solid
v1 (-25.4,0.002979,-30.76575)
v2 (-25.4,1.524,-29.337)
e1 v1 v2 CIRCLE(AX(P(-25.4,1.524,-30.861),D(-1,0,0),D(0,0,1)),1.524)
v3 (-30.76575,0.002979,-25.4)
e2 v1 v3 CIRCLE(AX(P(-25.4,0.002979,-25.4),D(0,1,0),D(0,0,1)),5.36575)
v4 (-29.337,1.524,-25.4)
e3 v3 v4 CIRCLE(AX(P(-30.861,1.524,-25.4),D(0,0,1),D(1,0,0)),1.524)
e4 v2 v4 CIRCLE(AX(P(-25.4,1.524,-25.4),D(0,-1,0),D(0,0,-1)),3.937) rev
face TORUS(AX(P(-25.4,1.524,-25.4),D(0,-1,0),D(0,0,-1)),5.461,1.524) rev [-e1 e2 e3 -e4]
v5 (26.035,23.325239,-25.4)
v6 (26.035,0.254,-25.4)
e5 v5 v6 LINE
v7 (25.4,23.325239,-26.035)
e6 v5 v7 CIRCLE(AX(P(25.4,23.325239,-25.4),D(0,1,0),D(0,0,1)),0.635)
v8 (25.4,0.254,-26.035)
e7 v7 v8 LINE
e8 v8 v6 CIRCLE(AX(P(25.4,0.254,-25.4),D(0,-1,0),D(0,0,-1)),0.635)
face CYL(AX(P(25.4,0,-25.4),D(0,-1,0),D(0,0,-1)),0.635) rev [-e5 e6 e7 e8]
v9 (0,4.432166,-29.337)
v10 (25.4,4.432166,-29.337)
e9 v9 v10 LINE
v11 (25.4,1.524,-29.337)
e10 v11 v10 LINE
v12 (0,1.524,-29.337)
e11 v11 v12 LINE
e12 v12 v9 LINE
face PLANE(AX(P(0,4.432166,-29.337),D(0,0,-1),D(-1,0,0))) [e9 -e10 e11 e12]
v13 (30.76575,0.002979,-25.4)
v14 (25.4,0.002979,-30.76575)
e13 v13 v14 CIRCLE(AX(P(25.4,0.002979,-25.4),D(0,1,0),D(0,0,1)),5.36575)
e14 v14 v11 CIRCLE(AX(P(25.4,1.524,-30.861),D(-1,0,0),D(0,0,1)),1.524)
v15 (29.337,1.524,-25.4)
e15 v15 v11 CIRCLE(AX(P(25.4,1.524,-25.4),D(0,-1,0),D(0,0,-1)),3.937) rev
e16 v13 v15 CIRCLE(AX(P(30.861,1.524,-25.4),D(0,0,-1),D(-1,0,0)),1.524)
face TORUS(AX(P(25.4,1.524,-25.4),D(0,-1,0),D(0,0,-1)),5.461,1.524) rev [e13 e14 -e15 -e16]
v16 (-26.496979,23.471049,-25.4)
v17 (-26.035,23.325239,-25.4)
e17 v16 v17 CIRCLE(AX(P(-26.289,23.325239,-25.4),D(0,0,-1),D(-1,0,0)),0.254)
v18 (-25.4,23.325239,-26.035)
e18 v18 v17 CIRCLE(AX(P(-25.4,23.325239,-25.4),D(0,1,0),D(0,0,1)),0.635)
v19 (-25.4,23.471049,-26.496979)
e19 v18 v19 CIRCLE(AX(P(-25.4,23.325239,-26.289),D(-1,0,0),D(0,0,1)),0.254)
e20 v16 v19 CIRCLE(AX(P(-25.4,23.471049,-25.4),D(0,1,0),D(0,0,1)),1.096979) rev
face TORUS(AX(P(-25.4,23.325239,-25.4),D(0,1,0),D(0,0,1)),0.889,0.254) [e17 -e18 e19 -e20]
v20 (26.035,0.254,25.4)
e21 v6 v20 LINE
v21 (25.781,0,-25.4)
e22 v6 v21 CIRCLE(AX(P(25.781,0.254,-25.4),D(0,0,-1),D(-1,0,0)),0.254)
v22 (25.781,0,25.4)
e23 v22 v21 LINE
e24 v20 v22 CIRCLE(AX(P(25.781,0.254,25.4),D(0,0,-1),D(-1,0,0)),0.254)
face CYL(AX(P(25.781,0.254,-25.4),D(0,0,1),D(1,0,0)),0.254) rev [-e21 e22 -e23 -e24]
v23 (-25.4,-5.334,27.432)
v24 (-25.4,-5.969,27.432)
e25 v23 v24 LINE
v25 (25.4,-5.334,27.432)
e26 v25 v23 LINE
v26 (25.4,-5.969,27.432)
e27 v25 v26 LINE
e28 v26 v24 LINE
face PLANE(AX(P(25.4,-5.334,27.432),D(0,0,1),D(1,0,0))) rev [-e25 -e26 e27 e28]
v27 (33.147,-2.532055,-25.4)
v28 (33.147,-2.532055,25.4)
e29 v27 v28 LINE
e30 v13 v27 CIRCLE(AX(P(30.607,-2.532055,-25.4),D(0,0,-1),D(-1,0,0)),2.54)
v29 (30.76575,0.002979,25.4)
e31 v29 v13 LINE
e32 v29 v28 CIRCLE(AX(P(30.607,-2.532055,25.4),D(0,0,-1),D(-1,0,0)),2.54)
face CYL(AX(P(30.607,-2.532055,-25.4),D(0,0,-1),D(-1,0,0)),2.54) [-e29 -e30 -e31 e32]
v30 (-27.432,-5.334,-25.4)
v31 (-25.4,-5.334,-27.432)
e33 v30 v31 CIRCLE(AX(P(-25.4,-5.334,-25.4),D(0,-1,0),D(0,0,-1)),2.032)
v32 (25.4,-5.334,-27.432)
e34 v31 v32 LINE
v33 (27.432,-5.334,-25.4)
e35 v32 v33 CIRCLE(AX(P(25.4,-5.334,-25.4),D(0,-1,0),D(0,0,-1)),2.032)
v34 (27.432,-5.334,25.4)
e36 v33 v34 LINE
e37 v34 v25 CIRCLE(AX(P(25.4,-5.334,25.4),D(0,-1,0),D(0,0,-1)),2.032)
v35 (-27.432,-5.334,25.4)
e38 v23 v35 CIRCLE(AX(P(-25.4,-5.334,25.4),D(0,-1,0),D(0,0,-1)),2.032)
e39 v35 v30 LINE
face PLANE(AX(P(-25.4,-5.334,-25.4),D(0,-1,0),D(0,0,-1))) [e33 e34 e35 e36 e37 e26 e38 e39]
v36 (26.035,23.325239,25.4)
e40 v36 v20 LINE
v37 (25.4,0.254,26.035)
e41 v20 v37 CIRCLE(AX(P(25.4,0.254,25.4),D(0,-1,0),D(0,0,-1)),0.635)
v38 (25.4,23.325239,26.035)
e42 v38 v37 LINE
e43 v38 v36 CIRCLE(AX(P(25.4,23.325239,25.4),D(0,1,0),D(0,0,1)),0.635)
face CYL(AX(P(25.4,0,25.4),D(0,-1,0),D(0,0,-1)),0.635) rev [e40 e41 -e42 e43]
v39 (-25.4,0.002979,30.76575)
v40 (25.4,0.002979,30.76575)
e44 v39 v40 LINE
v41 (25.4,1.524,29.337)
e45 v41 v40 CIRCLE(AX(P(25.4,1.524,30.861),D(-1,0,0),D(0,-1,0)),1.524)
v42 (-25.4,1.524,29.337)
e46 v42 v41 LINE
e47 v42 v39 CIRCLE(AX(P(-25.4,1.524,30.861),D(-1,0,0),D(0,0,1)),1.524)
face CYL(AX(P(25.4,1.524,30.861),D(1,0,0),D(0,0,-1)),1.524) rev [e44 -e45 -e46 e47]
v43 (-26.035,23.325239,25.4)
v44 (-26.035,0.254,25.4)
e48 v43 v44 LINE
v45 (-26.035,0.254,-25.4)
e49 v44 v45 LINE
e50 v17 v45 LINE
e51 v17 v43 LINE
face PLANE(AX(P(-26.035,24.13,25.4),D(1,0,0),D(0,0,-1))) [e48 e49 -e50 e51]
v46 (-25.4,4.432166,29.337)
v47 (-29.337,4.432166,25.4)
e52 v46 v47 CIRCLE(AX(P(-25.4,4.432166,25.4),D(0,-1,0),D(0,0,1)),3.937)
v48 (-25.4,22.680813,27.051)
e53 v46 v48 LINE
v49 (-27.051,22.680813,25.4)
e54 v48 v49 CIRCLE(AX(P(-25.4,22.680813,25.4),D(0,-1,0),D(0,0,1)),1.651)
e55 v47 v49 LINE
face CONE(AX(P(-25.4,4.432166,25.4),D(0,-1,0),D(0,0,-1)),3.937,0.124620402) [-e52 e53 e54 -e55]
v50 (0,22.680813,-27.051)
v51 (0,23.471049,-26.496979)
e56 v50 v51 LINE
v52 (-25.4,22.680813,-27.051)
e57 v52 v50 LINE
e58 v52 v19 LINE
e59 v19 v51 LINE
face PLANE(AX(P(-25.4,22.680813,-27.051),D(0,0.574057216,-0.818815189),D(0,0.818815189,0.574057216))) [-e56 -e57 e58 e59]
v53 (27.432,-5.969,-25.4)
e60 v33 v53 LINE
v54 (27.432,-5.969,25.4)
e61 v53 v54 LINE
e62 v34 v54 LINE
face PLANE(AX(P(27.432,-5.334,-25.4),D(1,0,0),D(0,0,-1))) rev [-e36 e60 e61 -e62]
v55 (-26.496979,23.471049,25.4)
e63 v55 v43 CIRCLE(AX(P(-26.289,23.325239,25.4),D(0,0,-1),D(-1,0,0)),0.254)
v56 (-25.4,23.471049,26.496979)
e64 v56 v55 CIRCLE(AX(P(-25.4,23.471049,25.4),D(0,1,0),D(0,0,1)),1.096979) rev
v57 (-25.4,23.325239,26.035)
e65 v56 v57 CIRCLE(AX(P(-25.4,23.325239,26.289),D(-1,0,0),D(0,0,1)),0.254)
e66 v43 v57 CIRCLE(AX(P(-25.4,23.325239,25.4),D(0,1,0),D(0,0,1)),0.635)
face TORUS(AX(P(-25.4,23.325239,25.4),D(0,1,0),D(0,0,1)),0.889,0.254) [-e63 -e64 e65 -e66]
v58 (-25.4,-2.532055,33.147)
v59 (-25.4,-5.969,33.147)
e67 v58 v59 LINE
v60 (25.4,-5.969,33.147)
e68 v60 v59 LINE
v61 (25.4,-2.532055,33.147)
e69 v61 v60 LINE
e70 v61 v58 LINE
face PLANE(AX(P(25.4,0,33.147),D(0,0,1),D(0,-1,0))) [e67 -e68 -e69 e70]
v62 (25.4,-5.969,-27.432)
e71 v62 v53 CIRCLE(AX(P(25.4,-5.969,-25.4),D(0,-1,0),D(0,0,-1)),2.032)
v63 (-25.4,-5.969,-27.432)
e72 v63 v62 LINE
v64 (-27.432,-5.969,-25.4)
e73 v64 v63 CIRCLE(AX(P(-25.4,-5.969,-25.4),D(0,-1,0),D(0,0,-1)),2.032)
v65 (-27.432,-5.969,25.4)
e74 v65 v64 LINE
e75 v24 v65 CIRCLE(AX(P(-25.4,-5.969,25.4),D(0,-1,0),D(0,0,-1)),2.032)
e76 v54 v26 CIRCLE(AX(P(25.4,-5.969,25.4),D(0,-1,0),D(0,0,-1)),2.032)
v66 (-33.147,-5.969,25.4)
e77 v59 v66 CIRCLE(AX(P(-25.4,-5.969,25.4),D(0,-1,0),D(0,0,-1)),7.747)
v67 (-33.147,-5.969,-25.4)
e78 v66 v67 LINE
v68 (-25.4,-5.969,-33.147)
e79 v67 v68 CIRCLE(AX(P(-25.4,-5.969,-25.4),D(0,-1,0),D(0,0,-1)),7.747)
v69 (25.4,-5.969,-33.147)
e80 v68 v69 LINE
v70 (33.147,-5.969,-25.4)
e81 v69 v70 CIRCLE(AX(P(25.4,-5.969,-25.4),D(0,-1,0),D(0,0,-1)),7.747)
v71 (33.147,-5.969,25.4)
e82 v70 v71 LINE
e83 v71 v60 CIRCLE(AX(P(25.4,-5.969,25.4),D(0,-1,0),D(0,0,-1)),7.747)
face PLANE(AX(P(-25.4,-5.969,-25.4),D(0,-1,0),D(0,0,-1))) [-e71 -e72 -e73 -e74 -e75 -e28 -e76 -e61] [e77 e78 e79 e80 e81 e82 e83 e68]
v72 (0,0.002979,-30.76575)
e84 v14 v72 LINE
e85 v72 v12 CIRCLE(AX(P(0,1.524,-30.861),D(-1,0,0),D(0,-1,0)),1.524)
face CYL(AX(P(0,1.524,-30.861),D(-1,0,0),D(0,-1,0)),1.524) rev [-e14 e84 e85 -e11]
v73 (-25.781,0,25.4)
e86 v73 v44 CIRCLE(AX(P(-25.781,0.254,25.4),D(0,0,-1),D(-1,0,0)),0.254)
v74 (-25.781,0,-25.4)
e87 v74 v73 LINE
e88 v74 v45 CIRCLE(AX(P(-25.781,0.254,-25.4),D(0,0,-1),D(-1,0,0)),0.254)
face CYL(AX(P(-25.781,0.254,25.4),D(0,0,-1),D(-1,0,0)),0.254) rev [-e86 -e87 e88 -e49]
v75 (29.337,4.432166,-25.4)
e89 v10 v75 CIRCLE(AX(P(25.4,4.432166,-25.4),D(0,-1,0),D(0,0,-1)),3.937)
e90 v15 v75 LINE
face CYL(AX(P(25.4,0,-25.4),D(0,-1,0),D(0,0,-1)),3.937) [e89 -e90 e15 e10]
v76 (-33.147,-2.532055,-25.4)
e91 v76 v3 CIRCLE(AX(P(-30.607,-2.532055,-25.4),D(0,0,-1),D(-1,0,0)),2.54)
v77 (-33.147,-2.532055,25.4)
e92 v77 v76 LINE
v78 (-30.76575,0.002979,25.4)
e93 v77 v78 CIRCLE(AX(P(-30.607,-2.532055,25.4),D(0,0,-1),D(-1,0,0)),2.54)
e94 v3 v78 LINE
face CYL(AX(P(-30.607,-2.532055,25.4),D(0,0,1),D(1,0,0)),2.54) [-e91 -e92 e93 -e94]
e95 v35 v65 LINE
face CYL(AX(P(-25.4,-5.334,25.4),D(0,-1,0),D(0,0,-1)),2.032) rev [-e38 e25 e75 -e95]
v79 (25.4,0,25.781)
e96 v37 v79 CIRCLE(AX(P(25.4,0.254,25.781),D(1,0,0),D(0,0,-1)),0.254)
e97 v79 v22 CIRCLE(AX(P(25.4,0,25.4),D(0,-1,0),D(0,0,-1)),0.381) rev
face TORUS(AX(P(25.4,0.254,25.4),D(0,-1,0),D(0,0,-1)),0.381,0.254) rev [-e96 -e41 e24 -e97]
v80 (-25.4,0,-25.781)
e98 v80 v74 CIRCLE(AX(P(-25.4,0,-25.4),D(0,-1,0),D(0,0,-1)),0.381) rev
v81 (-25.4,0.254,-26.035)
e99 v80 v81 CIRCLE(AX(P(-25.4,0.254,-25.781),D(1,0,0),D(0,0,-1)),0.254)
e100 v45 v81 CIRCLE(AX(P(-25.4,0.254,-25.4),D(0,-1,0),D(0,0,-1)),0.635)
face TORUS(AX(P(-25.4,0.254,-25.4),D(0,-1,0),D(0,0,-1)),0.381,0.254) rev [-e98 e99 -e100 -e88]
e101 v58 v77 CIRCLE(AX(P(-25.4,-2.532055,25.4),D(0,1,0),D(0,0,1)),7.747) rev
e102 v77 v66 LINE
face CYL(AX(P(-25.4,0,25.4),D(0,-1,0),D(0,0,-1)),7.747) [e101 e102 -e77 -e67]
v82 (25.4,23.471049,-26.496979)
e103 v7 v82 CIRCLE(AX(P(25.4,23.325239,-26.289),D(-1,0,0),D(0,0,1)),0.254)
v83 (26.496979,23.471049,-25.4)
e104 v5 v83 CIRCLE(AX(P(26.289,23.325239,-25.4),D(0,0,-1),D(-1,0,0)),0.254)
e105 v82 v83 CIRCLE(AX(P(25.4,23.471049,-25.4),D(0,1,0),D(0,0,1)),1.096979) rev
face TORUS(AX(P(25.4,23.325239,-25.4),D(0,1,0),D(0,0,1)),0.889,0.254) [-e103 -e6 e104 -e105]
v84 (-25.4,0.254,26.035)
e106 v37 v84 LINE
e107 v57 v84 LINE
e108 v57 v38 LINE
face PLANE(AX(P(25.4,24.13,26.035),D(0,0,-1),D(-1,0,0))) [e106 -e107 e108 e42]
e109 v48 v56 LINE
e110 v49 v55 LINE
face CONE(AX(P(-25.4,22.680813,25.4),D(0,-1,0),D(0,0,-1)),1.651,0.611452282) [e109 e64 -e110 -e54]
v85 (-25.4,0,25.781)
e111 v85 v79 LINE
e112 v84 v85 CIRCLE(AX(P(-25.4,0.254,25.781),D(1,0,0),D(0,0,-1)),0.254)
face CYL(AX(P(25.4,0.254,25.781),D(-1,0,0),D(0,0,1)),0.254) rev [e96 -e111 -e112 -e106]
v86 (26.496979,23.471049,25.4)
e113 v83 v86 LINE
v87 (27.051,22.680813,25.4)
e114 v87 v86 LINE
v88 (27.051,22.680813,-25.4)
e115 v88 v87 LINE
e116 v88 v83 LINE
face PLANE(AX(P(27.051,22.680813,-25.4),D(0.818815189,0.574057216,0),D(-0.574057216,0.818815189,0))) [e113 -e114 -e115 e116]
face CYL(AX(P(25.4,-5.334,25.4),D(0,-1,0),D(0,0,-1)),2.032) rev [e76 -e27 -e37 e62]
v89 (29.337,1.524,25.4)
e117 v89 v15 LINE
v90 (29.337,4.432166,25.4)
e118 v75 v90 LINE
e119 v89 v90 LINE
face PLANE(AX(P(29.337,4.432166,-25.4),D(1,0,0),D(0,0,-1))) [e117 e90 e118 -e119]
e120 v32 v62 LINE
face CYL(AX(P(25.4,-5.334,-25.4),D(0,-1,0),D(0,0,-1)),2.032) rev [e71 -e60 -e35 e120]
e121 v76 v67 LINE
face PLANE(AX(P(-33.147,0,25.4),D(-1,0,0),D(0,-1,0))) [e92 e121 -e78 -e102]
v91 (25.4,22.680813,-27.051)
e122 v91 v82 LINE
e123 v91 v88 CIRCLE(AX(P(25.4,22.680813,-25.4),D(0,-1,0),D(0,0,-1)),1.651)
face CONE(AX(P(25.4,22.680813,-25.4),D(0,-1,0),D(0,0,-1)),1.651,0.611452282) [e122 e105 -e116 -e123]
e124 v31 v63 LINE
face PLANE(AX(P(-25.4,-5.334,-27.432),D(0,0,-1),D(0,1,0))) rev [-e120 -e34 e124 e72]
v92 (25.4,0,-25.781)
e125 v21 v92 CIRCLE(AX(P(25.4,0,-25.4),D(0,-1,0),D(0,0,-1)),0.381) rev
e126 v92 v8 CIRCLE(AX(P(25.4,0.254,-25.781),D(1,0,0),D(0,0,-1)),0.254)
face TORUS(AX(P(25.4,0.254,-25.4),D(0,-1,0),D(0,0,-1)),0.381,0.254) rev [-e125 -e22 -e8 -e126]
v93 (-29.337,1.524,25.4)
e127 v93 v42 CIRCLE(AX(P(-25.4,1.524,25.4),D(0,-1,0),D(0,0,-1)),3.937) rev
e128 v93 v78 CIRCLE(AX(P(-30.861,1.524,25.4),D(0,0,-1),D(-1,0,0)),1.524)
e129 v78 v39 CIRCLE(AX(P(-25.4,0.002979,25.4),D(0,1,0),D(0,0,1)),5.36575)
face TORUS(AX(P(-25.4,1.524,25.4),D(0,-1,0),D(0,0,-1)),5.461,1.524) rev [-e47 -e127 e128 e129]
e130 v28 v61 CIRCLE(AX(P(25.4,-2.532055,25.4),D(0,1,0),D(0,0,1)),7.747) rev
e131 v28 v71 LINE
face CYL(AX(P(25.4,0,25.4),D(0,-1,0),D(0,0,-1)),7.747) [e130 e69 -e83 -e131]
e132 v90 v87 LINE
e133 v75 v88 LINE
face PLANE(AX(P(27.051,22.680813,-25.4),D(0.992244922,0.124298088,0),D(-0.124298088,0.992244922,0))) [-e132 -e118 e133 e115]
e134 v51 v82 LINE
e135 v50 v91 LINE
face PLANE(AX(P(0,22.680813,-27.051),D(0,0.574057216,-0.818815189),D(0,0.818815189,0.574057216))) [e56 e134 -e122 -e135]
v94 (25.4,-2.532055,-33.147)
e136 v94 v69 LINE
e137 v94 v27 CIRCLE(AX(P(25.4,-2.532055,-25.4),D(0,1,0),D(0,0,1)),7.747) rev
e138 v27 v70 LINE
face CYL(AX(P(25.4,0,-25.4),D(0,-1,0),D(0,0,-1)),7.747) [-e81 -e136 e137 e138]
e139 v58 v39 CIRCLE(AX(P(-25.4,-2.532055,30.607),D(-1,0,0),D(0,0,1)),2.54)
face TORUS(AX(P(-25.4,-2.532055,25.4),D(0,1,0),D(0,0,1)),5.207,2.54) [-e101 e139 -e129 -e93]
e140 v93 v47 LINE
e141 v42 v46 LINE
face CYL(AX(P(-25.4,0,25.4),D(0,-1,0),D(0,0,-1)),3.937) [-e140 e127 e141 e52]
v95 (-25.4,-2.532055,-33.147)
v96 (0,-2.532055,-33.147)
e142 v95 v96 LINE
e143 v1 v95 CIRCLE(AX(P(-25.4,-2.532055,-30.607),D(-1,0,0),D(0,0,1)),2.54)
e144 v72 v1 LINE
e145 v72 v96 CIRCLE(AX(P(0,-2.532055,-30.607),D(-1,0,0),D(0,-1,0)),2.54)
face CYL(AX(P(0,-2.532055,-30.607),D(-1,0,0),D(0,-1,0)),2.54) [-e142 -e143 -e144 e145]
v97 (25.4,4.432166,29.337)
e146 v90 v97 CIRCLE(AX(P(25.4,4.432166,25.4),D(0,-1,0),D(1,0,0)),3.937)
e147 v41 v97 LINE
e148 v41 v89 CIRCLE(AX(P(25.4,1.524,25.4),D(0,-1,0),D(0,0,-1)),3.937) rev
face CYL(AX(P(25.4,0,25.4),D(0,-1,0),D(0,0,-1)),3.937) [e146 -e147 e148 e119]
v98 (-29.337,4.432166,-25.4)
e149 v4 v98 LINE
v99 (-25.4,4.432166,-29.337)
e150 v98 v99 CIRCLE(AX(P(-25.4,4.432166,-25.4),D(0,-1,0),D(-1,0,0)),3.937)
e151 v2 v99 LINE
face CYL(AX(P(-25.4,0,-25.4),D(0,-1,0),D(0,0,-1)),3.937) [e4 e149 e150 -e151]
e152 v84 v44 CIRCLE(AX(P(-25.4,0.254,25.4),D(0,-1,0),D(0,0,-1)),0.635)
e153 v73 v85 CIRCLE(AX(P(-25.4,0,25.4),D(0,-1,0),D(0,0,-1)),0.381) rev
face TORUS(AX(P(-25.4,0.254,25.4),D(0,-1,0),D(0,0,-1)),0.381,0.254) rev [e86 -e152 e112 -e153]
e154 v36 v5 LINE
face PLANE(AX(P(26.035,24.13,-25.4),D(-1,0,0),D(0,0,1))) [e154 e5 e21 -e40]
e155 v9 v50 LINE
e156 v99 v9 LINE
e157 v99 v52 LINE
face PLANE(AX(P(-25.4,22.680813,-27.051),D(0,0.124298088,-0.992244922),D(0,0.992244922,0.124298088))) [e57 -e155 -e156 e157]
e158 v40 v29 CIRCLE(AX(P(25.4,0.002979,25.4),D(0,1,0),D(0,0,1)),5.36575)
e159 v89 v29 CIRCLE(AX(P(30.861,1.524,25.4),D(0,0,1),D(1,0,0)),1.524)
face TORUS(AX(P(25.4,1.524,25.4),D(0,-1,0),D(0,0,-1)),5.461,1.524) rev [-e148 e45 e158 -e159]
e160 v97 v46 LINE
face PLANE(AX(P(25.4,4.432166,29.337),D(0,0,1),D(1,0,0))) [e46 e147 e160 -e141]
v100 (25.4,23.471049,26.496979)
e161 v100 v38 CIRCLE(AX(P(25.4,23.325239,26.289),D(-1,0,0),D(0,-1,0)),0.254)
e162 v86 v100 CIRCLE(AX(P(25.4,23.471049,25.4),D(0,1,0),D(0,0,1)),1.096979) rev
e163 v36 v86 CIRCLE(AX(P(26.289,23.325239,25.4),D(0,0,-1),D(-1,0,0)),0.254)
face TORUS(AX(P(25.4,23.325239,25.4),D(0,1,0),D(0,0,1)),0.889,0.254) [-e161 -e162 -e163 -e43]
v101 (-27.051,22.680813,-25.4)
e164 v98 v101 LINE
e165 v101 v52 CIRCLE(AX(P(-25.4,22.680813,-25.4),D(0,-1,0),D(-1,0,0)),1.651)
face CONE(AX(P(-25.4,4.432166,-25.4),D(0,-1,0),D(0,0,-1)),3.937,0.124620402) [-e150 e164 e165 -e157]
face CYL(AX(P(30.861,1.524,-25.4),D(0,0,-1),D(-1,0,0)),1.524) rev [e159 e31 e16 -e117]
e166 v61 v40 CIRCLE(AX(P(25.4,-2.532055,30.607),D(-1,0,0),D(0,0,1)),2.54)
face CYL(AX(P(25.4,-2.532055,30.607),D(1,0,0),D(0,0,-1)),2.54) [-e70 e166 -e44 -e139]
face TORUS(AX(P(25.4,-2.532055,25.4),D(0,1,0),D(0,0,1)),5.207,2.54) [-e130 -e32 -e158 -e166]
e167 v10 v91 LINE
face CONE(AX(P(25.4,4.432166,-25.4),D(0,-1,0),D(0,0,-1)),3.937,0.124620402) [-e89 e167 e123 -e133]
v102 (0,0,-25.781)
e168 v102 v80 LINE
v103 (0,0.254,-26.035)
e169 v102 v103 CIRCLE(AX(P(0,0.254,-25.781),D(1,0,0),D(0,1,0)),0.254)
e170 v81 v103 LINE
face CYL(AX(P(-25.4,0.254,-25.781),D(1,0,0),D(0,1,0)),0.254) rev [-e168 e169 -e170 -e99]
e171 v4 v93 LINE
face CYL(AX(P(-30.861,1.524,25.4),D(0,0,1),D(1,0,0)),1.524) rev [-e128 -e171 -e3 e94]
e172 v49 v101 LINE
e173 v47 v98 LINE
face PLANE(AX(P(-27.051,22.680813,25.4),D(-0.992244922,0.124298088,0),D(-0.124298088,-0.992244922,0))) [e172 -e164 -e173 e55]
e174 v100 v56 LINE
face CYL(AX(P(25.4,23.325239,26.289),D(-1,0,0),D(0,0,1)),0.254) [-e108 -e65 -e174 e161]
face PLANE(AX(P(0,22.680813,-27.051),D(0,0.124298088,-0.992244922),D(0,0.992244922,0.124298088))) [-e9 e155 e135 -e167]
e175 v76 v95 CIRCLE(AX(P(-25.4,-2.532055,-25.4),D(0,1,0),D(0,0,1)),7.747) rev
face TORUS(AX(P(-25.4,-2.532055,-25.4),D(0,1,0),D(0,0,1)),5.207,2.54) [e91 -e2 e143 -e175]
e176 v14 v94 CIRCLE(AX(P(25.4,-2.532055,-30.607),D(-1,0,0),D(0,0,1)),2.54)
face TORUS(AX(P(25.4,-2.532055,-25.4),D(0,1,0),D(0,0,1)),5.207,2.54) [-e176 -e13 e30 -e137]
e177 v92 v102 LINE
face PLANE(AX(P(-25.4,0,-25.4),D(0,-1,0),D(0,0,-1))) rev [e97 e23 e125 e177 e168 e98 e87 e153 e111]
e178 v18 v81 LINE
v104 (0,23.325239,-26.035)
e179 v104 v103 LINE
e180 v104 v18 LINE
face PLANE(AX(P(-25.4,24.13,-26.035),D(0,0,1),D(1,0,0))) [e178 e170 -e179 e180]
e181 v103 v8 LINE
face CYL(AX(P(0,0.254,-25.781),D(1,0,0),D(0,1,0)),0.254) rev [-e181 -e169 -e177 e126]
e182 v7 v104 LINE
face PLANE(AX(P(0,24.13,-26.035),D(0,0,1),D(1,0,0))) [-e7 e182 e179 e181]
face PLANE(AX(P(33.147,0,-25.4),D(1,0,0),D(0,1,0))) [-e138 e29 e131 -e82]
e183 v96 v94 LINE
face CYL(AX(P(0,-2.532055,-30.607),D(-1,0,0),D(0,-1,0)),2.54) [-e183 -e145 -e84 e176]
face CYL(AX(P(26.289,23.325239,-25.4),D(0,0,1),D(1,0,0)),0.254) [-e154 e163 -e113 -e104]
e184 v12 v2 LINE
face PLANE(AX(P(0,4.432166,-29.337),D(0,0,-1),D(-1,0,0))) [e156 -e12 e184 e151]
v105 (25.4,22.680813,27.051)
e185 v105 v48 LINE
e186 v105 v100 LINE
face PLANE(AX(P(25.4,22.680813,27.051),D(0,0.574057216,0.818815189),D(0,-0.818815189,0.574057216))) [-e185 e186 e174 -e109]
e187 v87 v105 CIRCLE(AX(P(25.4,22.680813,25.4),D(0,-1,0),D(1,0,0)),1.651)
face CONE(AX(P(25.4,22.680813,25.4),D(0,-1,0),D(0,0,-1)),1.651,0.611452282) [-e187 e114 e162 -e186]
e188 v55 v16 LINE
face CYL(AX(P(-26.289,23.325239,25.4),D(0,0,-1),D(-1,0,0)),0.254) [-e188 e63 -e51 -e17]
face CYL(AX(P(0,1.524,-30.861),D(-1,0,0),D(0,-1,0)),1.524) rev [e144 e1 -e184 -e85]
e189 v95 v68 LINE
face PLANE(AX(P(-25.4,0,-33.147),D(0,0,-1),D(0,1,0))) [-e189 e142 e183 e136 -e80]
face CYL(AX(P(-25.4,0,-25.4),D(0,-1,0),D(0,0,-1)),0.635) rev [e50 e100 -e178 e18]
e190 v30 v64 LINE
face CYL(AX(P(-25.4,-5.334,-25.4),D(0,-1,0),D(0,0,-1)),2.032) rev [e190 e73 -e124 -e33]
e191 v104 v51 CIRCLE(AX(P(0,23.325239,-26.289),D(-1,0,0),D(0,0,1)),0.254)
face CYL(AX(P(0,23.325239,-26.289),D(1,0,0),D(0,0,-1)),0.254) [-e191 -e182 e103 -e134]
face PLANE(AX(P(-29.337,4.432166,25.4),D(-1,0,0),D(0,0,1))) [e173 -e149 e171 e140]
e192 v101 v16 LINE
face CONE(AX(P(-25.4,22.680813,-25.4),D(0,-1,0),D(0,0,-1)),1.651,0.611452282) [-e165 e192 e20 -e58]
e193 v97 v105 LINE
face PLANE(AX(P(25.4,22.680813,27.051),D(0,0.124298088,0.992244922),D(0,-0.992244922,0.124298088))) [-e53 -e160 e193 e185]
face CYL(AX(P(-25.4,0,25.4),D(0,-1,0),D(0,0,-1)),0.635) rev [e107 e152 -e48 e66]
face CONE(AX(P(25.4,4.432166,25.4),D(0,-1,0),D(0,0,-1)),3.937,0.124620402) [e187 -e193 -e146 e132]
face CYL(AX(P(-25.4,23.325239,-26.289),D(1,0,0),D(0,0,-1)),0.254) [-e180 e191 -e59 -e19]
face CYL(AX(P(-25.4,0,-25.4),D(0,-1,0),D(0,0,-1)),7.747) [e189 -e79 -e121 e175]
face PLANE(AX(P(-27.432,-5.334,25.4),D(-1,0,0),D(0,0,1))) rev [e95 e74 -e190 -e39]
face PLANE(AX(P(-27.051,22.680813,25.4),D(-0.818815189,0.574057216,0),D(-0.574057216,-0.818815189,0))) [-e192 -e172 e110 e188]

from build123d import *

# Parameters (mm, degrees)
BOSS_EXTRUDE1_DEPTH = 5.969
CUT_EXTRUDE1_DEPTH  = 0.635
BOSS_EXTRUDE2_DEPTH = 5.969
FILLET4_R           = 1.524
FILLET5_R           = 2.54
FILLET3_R           = 0.254


with BuildPart() as part:
    # Sweep1: sweep along a path in Sketch1
    with BuildLine(Plane(origin=(0, 0, 0), x_dir=(1, 0, 0), z_dir=(0, 1, 0))) as sweep1_path:
        Line((-25.4, 28.575), (25.4, 28.575))
        ThreePointArc((25.4, 28.575), (27.64506403, 27.64506403), (28.575, 25.4))
        Line((28.575, 25.4), (28.575, -25.4))
        ThreePointArc((28.575, -25.4), (27.64506403, -27.64506403), (25.4, -28.575))
        Line((25.4, -28.575), (-25.4, -28.575))
        ThreePointArc((-25.4, -28.575), (-27.64506403, -27.64506403), (-28.575, -25.4))
        Line((-28.575, -25.4), (-28.575, 25.4))
        ThreePointArc((-28.575, 25.4), (-27.64506403, 27.64506403), (-25.4, 28.575))
    # Sketch2 → Sweep1 (sweep)
    with BuildSketch(Plane(origin=(0, 0, 0), x_dir=(0, 0, -1), z_dir=(1, 0, 0))):
        Polygon((27.051, 22.68081304), (29.337, 4.432166315), (29.337, 0), (26.035, 0), (26.035, 24.13), align=None)
    sweep(path=sweep1_path.line)

    # Sketch3 → Boss-Extrude1 (add)
    with BuildSketch(Plane.XZ):
        with BuildLine():
            Line((-25.4, -29.337), (0, -29.337))
            Line((0, -29.337), (25.4, -29.337))
            ThreePointArc((25.4, -29.337), (28.183879398, -28.183879398), (29.337, -25.4))
            Line((29.337, -25.4), (29.337, 25.4))
            ThreePointArc((29.337, 25.4), (28.183879398, 28.183879398), (25.4, 29.337))
            Line((25.4, 29.337), (-25.4, 29.337))
            ThreePointArc((-25.4, 29.337), (-28.183879398, 28.183879398), (-29.337, 25.4))
            Line((-29.337, 25.4), (-29.337, -25.4))
            ThreePointArc((-29.337, -25.4), (-28.183879398, -28.183879398), (-25.4, -29.337))
        make_face()
    extrude(amount=BOSS_EXTRUDE1_DEPTH)

    # Sketch4 → Cut-Extrude1 (cut)
    with BuildSketch(Plane.XZ.offset(5.969)):
        with BuildLine():
            Line((-25.4, -27.432), (25.4, -27.432))
            ThreePointArc((25.4, -27.432), (26.836840979, -26.836840979), (27.432, -25.4))
            Line((27.432, -25.4), (27.432, 25.4))
            ThreePointArc((27.432, 25.4), (26.836840979, 26.836840979), (25.4, 27.432))
            Line((25.4, 27.432), (-25.4, 27.432))
            ThreePointArc((-25.4, 27.432), (-26.836840979, 26.836840979), (-27.432, 25.4))
            Line((-27.432, 25.4), (-27.432, -25.4))
            ThreePointArc((-27.432, -25.4), (-26.836840979, -26.836840979), (-25.4, -27.432))
        make_face()
    extrude(amount=-CUT_EXTRUDE1_DEPTH, mode=Mode.SUBTRACT)

    # Sketch5 → Boss-Extrude2 (add)
    with BuildSketch(Plane.XZ.offset(5.969)):
        with BuildLine():
            Line((-33.147, 25.4), (-33.147, -25.4))
            ThreePointArc((-33.147, -25.4), (-30.877956234, -30.877956234), (-25.4, -33.147))
            Line((-25.4, -33.147), (25.4, -33.147))
            ThreePointArc((25.4, -33.147), (30.877956234, -30.877956234), (33.147, -25.4))
            Line((33.147, -25.4), (33.147, 25.4))
            ThreePointArc((33.147, 25.4), (30.877956234, 30.877956234), (25.4, 33.147))
            Line((25.4, 33.147), (-25.4, 33.147))
            ThreePointArc((-25.4, 33.147), (-30.877956234, 30.877956234), (-33.147, 25.4))
        make_face()
        with BuildLine():
            Line((-27.432, 25.4), (-27.432, -25.4))
            ThreePointArc((-27.432, -25.4), (-26.836840979, -26.836840979), (-25.4, -27.432))
            Line((-25.4, -27.432), (25.4, -27.432))
            ThreePointArc((25.4, -27.432), (26.836840979, -26.836840979), (27.432, -25.4))
            Line((27.432, -25.4), (27.432, 25.4))
            ThreePointArc((27.432, 25.4), (26.836840979, 26.836840979), (25.4, 27.432))
            Line((25.4, 27.432), (-25.4, 27.432))
            ThreePointArc((-25.4, 27.432), (-26.836840979, 26.836840979), (-27.432, 25.4))
        make_face(mode=Mode.SUBTRACT)
    extrude(amount=-BOSS_EXTRUDE2_DEPTH)

    # Fillet4
    fillet4_edges = [part.edges().sort_by_distance(p)[0] for p in [
        (0, 0, -29.337),
        (0, 0, -29.337),
        (-28.183879398, 0, -28.183879398),
        (-29.337, 0, 0),
        (-28.183879398, 0, 28.183879398),
        (0, 0, 29.337),
        (28.183879398, 0, 28.183879398),
        (29.337, 0, 0),
        (28.183879398, 0, -28.183879398),
    ]]
    fillet(fillet4_edges, radius=FILLET4_R)

    # Fillet5
    # the kernel refuses this fillet: 2.54 mm, written as the material it takes off along each edge
    with BuildSketch(Plane(origin=(-25.4, 0, -25.4), x_dir=(-1, 0, 0), z_dir=(0, 0, 1))) as fillet5_piece_1:
        with BuildLine():
            CenterArc((5.207, 2.532054733), FILLET5_R, 273.583321698, 86.416678302)
            Line((7.747, 2.532054733), (8.001, 2.532054733))
            Line((8.001, 2.532054733), (8.001, 0))
            Line((8.001, 0), (7.747, -0.254))
            ThreePointArc((7.747, -0.254), (5.461, -0.254), (5.381625, -0.256482896))
            Line((5.381625, -0.256482896), (5.36575, -0.002979475))
        make_face()
    revolve(axis=Axis((-25.4, 0, -25.4), (0, -1, 0)), revolution_arc=90, mode=Mode.SUBTRACT)
    with BuildSketch(Plane(origin=(-33.147, 0, 25.4), x_dir=(0.9999992172213047, 0.001251222113716365, 0), z_dir=(0, 0, -1)), Plane(origin=(25.4, 0, 33.147), x_dir=(0, 0.0012512221137164234, -0.9999992172213047), z_dir=(-1, 0, 0)), Plane(origin=(33.147, 0, -25.4), x_dir=(-0.9999992172213047, 0.0012512221137164405, 0), z_dir=(0, 0, 1)), Plane(origin=(-25.4, 0, -33.147), x_dir=(0, 0.001251222113716569, 0.9999992172213047), z_dir=(1, 0, 0))) as fillet5_piece_2:
        with BuildLine():
            CenterArc((2.536829849, 2.535230855), FILLET5_R, 180.071689765, 86.416678302)
            Line((-0.003168163, 2.532052751), (-0.257167964, 2.531734941))
            Line((-0.257167964, 2.531734941), (-0.253999801, -0.00031781))
            Line((-0.253999801, -0.00031781), (0.00031781, -0.253999801))
            ThreePointArc((0.00031781, -0.253999801), (2.286316021, -0.251139507), (2.365694066, -0.253523086))
            Line((2.365694066, -0.253523086), (2.381251864, 0))
        make_face()
    extrude(amount=50.8, mode=Mode.SUBTRACT)
    with BuildSketch(Plane(origin=(-25.4, 0, 25.4), x_dir=(0, 0, 1), z_dir=(1, 0, 0))) as fillet5_piece_3:
        with BuildLine():
            CenterArc((5.207, 2.532054733), FILLET5_R, 273.583321698, 86.416678302)
            Line((7.747, 2.532054733), (8.001, 2.532054733))
            Line((8.001, 2.532054733), (8.001, 0))
            Line((8.001, 0), (7.747, -0.254))
            ThreePointArc((7.747, -0.254), (5.461, -0.254), (5.381625, -0.256482896))
            Line((5.381625, -0.256482896), (5.36575, -0.002979475))
        make_face()
    revolve(axis=Axis((-25.4, 0, 25.4), (0, -1, 0)), revolution_arc=90, mode=Mode.SUBTRACT)
    with BuildSketch(Plane(origin=(25.4, 0, 25.4), x_dir=(1, 0, 0), z_dir=(0, 0, -1))) as fillet5_piece_4:
        with BuildLine():
            CenterArc((5.207, 2.532054733), FILLET5_R, 273.583321698, 86.416678302)
            Line((7.747, 2.532054733), (8.001, 2.532054733))
            Line((8.001, 2.532054733), (8.001, 0))
            Line((8.001, 0), (7.747, -0.254))
            ThreePointArc((7.747, -0.254), (5.461, -0.254), (5.381625, -0.256482896))
            Line((5.381625, -0.256482896), (5.36575, -0.002979475))
        make_face()
    revolve(axis=Axis((25.4, 0, 25.4), (0, -1, 0)), revolution_arc=90, mode=Mode.SUBTRACT)
    with BuildSketch(Plane(origin=(25.4, 0, -25.4), x_dir=(0, 0, -1), z_dir=(-1, 0, 0))) as fillet5_piece_5:
        with BuildLine():
            CenterArc((5.207, 2.532054733), FILLET5_R, 273.583321698, 86.416678302)
            Line((7.747, 2.532054733), (8.001, 2.532054733))
            Line((8.001, 2.532054733), (8.001, 0))
            Line((8.001, 0), (7.747, -0.254))
            ThreePointArc((7.747, -0.254), (5.461, -0.254), (5.381625, -0.256482896))
            Line((5.381625, -0.256482896), (5.36575, -0.002979475))
        make_face()
    revolve(axis=Axis((25.4, 0, -25.4), (0, -1, 0)), revolution_arc=90, mode=Mode.SUBTRACT)

    # Fillet3
    fillet3_edges = [part.edges().sort_by_distance(p)[0] for p in [
        (25.849012806, 24.13, 25.849012806),
        (0, 0, 26.035),
        (0, 24.13, 26.035),
        (-25.849012806, 0, 25.849012806),
        (-25.849012806, 24.13, 25.849012806),
        (0, 0, -26.035),
        (-26.035, 0, 0),
        (-26.035, 24.13, 0),
        (-25.849012806, 0, -25.849012806),
        (-25.849012806, 24.13, -25.849012806),
        (0, 0, -26.035),
        (0, 24.13, -26.035),
        (0, 24.13, -26.035),
        (25.849012806, 0, -25.849012806),
        (25.849012806, 24.13, -25.849012806),
        (26.035, 0, 0),
        (26.035, 24.13, 0),
        (25.849012806, 0, 25.849012806),
    ]]
    fillet(fillet3_edges, radius=FILLET3_R)


solid = part.part
